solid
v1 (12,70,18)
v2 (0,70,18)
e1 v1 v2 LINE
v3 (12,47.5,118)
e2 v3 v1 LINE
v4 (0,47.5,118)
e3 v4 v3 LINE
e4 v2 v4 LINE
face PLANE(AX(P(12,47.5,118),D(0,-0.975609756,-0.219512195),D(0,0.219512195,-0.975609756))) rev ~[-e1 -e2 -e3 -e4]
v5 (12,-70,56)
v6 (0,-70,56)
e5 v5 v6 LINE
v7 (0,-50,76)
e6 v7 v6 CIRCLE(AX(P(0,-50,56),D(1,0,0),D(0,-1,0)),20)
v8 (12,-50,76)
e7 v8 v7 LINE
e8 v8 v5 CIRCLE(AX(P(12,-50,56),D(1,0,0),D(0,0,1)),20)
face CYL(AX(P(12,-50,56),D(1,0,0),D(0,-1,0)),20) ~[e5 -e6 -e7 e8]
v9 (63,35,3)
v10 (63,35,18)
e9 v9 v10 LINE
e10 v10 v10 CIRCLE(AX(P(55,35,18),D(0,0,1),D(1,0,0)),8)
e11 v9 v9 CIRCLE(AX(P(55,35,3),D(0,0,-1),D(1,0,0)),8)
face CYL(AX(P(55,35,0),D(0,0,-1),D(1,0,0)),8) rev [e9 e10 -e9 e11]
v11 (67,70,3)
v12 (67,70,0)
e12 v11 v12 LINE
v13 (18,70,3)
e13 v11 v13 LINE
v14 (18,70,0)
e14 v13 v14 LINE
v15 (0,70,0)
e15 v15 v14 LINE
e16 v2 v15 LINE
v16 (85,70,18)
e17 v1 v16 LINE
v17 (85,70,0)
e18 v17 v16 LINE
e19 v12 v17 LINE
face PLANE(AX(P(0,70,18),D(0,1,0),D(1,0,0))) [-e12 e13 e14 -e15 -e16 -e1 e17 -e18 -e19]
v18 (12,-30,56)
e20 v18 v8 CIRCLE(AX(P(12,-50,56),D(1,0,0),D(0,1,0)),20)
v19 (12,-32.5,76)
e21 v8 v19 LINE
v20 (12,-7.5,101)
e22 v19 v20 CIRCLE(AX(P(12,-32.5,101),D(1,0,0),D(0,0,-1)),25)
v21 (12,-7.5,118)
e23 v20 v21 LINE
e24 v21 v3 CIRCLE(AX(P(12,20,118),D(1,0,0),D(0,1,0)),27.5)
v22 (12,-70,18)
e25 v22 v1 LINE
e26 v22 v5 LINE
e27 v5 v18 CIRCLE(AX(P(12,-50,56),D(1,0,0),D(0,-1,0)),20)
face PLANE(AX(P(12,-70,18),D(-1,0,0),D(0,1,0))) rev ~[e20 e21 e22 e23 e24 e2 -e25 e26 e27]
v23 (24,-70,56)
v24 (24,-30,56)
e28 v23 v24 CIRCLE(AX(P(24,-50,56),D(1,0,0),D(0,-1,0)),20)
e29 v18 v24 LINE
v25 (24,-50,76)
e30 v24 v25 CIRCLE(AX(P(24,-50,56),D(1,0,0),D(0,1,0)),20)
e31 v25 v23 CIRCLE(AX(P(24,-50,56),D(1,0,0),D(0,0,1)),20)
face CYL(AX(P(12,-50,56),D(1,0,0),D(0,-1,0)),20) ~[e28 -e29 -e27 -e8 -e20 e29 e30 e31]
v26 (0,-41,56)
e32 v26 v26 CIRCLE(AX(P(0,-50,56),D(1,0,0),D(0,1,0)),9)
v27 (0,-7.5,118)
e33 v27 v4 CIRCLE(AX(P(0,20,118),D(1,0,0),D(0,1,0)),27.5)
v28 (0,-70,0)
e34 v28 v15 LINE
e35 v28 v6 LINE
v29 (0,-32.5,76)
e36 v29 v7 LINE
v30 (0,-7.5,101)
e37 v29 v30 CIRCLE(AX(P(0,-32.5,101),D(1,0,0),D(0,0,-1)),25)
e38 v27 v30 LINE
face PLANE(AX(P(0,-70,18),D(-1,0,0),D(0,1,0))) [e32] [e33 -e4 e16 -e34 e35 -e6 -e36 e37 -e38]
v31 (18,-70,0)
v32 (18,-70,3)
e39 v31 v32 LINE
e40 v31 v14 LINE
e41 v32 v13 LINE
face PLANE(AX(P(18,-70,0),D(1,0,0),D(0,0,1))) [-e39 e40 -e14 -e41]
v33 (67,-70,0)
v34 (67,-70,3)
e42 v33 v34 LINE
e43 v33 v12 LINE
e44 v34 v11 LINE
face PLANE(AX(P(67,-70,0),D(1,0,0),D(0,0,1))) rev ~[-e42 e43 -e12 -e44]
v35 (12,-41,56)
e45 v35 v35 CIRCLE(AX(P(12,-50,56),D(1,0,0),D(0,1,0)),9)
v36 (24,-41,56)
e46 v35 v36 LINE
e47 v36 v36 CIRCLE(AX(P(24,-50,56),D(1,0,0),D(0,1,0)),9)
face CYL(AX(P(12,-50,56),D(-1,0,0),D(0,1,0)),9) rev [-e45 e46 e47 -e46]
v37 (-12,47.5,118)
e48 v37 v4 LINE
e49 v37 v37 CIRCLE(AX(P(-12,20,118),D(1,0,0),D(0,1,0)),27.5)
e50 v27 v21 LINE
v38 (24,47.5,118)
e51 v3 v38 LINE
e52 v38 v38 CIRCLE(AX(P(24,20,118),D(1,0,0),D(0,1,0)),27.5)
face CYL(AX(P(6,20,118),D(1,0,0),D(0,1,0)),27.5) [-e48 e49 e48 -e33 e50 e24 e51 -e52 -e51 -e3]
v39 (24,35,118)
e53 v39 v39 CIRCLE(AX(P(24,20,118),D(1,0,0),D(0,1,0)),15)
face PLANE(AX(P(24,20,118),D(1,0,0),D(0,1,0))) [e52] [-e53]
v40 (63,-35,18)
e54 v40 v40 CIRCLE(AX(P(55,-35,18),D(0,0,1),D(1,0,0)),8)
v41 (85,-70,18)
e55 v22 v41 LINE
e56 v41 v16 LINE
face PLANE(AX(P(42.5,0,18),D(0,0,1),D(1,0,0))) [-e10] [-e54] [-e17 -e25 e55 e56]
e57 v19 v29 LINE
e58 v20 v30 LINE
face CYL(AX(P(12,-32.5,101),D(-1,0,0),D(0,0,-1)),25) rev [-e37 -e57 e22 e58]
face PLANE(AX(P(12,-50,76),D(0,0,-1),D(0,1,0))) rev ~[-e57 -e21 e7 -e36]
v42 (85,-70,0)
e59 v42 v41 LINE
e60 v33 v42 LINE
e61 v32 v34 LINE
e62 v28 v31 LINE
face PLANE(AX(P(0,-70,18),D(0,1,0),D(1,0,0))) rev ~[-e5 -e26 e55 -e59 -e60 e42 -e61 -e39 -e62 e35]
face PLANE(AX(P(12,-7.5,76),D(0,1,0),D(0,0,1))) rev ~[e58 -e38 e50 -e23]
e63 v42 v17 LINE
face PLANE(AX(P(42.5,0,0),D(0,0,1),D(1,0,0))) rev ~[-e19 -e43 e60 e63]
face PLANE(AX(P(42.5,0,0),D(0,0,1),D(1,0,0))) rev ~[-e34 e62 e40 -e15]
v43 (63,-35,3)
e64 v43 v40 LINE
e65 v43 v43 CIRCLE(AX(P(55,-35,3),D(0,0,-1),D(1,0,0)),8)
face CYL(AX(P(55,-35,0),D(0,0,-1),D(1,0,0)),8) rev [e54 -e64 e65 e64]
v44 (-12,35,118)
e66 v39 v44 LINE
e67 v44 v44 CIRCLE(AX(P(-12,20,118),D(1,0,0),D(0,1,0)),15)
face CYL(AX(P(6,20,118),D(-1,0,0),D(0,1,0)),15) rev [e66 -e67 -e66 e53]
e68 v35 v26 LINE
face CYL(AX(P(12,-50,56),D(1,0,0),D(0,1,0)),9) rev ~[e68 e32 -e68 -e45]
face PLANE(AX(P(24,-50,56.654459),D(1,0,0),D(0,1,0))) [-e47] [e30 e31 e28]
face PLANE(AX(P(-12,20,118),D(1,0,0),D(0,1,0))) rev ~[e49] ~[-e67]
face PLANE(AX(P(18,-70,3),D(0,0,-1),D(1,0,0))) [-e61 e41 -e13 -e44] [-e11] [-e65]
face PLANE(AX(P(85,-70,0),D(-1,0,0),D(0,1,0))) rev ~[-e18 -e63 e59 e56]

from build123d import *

# Parameters (mm, degrees)
F0_W      = 85
F0_H      = 140
F0_R      = 8
F1_DEPTH  = 18
F2_W      = 49
F2_H      = 3
F3_DEPTH  = 140.001
F4_W      = 12
F4_H      = 140
F5_DEPTH  = 100
F6_R      = 9
F7_DEPTH  = 12
F9_R      = 27.5
F9_R_2    = 15
F10_DEPTH = 18
F11_DEPTH = 25
F12_DEPTH = 25
F13_R     = 25
F14_DEPTH = 25


with BuildPart() as f1:
    # F0 (on Top) → F1 (new body)
    with BuildSketch(Plane.XY):
        with Locations((42.5, 0)):
            Rectangle(F0_W, F0_H)
        with Locations((55, -35)):
            Circle(F0_R, mode=Mode.SUBTRACT)
        with Locations((55, 35)):
            Circle(F0_R, mode=Mode.SUBTRACT)
    extrude(amount=F1_DEPTH)

    # F2 (on face) → F3 (cut, through all)
    with BuildSketch(Plane.XZ.offset(70)):
        with Locations((42.5, 1.5)):
            Rectangle(F2_W, F2_H)
    extrude(amount=-F3_DEPTH, mode=Mode.SUBTRACT)

    # F4 (on face) → F5 (join)
    with BuildSketch(Plane.XY.offset(18)):
        with Locations((6, 0)):
            Rectangle(F4_W, F4_H)
    extrude(amount=F5_DEPTH)

    # F6 (on face) → F7 (join)
    with BuildSketch(Plane.YZ.offset(12)):
        with BuildLine():
            ThreePointArc((-30, 56), (-35.8578643763, 70.1421356237), (-50, 76))
            ThreePointArc((-50, 76), (-64.1421356237, 70.1421356237), (-70, 56))
            ThreePointArc((-70, 56), (-50, 36), (-30, 56))
        make_face()
        with Locations((-50, 56)):
            Circle(F6_R, mode=Mode.SUBTRACT)
    extrude(amount=F7_DEPTH)

    # F9 (on offset) → F10 (join, symmetric)
    with BuildSketch(Plane.YZ.offset(6)):
        with Locations((20, 118)):
            Circle(F9_R)
        with Locations((20, 118)):
            Circle(F9_R_2, mode=Mode.SUBTRACT)
    extrude(amount=F10_DEPTH, both=True)

    # F6 (on face) → F11 (cut)
    with BuildSketch(Plane.YZ.offset(12)):
        with Locations((-50, 56)):
            Circle(F6_R)
        with BuildLine():
            ThreePointArc((5, 118), (20, 103), (35, 118))
            Line((35, 118), (20, 118))
            Line((20, 118), (5, 118))
        make_face()
    extrude(amount=-F11_DEPTH, mode=Mode.SUBTRACT)

    # F6 (on face) → F12 (cut)
    with BuildSketch(Plane.YZ.offset(12)):
        with BuildLine():
            Line((-7.5, 76), (-7.5, 118))
            Line((-7.5, 118), (-70, 118))
            Line((-70, 118), (-70, 56))
            ThreePointArc((-70, 56), (-64.1421356237, 70.1421356237), (-50, 76))
            Line((-50, 76), (-7.5, 76))
        make_face()
        Polygon((70, 118), (47.5, 118), (70, 18), align=None)
    extrude(amount=-F12_DEPTH, mode=Mode.SUBTRACT)

    # F13
    f13_edges = [f1.edges().sort_by_distance(p)[0] for p in [
        (6, -7.5, 76),
    ]]
    fillet(f13_edges, radius=F13_R)

    # F0 (on Top) → F14 (cut)
    with BuildSketch(Plane.XY):
        with Locations((55, -35)):
            Circle(F0_R)
        with Locations((55, 35)):
            Circle(F0_R)
    extrude(amount=-F14_DEPTH, mode=Mode.SUBTRACT)


solid = f1.part
